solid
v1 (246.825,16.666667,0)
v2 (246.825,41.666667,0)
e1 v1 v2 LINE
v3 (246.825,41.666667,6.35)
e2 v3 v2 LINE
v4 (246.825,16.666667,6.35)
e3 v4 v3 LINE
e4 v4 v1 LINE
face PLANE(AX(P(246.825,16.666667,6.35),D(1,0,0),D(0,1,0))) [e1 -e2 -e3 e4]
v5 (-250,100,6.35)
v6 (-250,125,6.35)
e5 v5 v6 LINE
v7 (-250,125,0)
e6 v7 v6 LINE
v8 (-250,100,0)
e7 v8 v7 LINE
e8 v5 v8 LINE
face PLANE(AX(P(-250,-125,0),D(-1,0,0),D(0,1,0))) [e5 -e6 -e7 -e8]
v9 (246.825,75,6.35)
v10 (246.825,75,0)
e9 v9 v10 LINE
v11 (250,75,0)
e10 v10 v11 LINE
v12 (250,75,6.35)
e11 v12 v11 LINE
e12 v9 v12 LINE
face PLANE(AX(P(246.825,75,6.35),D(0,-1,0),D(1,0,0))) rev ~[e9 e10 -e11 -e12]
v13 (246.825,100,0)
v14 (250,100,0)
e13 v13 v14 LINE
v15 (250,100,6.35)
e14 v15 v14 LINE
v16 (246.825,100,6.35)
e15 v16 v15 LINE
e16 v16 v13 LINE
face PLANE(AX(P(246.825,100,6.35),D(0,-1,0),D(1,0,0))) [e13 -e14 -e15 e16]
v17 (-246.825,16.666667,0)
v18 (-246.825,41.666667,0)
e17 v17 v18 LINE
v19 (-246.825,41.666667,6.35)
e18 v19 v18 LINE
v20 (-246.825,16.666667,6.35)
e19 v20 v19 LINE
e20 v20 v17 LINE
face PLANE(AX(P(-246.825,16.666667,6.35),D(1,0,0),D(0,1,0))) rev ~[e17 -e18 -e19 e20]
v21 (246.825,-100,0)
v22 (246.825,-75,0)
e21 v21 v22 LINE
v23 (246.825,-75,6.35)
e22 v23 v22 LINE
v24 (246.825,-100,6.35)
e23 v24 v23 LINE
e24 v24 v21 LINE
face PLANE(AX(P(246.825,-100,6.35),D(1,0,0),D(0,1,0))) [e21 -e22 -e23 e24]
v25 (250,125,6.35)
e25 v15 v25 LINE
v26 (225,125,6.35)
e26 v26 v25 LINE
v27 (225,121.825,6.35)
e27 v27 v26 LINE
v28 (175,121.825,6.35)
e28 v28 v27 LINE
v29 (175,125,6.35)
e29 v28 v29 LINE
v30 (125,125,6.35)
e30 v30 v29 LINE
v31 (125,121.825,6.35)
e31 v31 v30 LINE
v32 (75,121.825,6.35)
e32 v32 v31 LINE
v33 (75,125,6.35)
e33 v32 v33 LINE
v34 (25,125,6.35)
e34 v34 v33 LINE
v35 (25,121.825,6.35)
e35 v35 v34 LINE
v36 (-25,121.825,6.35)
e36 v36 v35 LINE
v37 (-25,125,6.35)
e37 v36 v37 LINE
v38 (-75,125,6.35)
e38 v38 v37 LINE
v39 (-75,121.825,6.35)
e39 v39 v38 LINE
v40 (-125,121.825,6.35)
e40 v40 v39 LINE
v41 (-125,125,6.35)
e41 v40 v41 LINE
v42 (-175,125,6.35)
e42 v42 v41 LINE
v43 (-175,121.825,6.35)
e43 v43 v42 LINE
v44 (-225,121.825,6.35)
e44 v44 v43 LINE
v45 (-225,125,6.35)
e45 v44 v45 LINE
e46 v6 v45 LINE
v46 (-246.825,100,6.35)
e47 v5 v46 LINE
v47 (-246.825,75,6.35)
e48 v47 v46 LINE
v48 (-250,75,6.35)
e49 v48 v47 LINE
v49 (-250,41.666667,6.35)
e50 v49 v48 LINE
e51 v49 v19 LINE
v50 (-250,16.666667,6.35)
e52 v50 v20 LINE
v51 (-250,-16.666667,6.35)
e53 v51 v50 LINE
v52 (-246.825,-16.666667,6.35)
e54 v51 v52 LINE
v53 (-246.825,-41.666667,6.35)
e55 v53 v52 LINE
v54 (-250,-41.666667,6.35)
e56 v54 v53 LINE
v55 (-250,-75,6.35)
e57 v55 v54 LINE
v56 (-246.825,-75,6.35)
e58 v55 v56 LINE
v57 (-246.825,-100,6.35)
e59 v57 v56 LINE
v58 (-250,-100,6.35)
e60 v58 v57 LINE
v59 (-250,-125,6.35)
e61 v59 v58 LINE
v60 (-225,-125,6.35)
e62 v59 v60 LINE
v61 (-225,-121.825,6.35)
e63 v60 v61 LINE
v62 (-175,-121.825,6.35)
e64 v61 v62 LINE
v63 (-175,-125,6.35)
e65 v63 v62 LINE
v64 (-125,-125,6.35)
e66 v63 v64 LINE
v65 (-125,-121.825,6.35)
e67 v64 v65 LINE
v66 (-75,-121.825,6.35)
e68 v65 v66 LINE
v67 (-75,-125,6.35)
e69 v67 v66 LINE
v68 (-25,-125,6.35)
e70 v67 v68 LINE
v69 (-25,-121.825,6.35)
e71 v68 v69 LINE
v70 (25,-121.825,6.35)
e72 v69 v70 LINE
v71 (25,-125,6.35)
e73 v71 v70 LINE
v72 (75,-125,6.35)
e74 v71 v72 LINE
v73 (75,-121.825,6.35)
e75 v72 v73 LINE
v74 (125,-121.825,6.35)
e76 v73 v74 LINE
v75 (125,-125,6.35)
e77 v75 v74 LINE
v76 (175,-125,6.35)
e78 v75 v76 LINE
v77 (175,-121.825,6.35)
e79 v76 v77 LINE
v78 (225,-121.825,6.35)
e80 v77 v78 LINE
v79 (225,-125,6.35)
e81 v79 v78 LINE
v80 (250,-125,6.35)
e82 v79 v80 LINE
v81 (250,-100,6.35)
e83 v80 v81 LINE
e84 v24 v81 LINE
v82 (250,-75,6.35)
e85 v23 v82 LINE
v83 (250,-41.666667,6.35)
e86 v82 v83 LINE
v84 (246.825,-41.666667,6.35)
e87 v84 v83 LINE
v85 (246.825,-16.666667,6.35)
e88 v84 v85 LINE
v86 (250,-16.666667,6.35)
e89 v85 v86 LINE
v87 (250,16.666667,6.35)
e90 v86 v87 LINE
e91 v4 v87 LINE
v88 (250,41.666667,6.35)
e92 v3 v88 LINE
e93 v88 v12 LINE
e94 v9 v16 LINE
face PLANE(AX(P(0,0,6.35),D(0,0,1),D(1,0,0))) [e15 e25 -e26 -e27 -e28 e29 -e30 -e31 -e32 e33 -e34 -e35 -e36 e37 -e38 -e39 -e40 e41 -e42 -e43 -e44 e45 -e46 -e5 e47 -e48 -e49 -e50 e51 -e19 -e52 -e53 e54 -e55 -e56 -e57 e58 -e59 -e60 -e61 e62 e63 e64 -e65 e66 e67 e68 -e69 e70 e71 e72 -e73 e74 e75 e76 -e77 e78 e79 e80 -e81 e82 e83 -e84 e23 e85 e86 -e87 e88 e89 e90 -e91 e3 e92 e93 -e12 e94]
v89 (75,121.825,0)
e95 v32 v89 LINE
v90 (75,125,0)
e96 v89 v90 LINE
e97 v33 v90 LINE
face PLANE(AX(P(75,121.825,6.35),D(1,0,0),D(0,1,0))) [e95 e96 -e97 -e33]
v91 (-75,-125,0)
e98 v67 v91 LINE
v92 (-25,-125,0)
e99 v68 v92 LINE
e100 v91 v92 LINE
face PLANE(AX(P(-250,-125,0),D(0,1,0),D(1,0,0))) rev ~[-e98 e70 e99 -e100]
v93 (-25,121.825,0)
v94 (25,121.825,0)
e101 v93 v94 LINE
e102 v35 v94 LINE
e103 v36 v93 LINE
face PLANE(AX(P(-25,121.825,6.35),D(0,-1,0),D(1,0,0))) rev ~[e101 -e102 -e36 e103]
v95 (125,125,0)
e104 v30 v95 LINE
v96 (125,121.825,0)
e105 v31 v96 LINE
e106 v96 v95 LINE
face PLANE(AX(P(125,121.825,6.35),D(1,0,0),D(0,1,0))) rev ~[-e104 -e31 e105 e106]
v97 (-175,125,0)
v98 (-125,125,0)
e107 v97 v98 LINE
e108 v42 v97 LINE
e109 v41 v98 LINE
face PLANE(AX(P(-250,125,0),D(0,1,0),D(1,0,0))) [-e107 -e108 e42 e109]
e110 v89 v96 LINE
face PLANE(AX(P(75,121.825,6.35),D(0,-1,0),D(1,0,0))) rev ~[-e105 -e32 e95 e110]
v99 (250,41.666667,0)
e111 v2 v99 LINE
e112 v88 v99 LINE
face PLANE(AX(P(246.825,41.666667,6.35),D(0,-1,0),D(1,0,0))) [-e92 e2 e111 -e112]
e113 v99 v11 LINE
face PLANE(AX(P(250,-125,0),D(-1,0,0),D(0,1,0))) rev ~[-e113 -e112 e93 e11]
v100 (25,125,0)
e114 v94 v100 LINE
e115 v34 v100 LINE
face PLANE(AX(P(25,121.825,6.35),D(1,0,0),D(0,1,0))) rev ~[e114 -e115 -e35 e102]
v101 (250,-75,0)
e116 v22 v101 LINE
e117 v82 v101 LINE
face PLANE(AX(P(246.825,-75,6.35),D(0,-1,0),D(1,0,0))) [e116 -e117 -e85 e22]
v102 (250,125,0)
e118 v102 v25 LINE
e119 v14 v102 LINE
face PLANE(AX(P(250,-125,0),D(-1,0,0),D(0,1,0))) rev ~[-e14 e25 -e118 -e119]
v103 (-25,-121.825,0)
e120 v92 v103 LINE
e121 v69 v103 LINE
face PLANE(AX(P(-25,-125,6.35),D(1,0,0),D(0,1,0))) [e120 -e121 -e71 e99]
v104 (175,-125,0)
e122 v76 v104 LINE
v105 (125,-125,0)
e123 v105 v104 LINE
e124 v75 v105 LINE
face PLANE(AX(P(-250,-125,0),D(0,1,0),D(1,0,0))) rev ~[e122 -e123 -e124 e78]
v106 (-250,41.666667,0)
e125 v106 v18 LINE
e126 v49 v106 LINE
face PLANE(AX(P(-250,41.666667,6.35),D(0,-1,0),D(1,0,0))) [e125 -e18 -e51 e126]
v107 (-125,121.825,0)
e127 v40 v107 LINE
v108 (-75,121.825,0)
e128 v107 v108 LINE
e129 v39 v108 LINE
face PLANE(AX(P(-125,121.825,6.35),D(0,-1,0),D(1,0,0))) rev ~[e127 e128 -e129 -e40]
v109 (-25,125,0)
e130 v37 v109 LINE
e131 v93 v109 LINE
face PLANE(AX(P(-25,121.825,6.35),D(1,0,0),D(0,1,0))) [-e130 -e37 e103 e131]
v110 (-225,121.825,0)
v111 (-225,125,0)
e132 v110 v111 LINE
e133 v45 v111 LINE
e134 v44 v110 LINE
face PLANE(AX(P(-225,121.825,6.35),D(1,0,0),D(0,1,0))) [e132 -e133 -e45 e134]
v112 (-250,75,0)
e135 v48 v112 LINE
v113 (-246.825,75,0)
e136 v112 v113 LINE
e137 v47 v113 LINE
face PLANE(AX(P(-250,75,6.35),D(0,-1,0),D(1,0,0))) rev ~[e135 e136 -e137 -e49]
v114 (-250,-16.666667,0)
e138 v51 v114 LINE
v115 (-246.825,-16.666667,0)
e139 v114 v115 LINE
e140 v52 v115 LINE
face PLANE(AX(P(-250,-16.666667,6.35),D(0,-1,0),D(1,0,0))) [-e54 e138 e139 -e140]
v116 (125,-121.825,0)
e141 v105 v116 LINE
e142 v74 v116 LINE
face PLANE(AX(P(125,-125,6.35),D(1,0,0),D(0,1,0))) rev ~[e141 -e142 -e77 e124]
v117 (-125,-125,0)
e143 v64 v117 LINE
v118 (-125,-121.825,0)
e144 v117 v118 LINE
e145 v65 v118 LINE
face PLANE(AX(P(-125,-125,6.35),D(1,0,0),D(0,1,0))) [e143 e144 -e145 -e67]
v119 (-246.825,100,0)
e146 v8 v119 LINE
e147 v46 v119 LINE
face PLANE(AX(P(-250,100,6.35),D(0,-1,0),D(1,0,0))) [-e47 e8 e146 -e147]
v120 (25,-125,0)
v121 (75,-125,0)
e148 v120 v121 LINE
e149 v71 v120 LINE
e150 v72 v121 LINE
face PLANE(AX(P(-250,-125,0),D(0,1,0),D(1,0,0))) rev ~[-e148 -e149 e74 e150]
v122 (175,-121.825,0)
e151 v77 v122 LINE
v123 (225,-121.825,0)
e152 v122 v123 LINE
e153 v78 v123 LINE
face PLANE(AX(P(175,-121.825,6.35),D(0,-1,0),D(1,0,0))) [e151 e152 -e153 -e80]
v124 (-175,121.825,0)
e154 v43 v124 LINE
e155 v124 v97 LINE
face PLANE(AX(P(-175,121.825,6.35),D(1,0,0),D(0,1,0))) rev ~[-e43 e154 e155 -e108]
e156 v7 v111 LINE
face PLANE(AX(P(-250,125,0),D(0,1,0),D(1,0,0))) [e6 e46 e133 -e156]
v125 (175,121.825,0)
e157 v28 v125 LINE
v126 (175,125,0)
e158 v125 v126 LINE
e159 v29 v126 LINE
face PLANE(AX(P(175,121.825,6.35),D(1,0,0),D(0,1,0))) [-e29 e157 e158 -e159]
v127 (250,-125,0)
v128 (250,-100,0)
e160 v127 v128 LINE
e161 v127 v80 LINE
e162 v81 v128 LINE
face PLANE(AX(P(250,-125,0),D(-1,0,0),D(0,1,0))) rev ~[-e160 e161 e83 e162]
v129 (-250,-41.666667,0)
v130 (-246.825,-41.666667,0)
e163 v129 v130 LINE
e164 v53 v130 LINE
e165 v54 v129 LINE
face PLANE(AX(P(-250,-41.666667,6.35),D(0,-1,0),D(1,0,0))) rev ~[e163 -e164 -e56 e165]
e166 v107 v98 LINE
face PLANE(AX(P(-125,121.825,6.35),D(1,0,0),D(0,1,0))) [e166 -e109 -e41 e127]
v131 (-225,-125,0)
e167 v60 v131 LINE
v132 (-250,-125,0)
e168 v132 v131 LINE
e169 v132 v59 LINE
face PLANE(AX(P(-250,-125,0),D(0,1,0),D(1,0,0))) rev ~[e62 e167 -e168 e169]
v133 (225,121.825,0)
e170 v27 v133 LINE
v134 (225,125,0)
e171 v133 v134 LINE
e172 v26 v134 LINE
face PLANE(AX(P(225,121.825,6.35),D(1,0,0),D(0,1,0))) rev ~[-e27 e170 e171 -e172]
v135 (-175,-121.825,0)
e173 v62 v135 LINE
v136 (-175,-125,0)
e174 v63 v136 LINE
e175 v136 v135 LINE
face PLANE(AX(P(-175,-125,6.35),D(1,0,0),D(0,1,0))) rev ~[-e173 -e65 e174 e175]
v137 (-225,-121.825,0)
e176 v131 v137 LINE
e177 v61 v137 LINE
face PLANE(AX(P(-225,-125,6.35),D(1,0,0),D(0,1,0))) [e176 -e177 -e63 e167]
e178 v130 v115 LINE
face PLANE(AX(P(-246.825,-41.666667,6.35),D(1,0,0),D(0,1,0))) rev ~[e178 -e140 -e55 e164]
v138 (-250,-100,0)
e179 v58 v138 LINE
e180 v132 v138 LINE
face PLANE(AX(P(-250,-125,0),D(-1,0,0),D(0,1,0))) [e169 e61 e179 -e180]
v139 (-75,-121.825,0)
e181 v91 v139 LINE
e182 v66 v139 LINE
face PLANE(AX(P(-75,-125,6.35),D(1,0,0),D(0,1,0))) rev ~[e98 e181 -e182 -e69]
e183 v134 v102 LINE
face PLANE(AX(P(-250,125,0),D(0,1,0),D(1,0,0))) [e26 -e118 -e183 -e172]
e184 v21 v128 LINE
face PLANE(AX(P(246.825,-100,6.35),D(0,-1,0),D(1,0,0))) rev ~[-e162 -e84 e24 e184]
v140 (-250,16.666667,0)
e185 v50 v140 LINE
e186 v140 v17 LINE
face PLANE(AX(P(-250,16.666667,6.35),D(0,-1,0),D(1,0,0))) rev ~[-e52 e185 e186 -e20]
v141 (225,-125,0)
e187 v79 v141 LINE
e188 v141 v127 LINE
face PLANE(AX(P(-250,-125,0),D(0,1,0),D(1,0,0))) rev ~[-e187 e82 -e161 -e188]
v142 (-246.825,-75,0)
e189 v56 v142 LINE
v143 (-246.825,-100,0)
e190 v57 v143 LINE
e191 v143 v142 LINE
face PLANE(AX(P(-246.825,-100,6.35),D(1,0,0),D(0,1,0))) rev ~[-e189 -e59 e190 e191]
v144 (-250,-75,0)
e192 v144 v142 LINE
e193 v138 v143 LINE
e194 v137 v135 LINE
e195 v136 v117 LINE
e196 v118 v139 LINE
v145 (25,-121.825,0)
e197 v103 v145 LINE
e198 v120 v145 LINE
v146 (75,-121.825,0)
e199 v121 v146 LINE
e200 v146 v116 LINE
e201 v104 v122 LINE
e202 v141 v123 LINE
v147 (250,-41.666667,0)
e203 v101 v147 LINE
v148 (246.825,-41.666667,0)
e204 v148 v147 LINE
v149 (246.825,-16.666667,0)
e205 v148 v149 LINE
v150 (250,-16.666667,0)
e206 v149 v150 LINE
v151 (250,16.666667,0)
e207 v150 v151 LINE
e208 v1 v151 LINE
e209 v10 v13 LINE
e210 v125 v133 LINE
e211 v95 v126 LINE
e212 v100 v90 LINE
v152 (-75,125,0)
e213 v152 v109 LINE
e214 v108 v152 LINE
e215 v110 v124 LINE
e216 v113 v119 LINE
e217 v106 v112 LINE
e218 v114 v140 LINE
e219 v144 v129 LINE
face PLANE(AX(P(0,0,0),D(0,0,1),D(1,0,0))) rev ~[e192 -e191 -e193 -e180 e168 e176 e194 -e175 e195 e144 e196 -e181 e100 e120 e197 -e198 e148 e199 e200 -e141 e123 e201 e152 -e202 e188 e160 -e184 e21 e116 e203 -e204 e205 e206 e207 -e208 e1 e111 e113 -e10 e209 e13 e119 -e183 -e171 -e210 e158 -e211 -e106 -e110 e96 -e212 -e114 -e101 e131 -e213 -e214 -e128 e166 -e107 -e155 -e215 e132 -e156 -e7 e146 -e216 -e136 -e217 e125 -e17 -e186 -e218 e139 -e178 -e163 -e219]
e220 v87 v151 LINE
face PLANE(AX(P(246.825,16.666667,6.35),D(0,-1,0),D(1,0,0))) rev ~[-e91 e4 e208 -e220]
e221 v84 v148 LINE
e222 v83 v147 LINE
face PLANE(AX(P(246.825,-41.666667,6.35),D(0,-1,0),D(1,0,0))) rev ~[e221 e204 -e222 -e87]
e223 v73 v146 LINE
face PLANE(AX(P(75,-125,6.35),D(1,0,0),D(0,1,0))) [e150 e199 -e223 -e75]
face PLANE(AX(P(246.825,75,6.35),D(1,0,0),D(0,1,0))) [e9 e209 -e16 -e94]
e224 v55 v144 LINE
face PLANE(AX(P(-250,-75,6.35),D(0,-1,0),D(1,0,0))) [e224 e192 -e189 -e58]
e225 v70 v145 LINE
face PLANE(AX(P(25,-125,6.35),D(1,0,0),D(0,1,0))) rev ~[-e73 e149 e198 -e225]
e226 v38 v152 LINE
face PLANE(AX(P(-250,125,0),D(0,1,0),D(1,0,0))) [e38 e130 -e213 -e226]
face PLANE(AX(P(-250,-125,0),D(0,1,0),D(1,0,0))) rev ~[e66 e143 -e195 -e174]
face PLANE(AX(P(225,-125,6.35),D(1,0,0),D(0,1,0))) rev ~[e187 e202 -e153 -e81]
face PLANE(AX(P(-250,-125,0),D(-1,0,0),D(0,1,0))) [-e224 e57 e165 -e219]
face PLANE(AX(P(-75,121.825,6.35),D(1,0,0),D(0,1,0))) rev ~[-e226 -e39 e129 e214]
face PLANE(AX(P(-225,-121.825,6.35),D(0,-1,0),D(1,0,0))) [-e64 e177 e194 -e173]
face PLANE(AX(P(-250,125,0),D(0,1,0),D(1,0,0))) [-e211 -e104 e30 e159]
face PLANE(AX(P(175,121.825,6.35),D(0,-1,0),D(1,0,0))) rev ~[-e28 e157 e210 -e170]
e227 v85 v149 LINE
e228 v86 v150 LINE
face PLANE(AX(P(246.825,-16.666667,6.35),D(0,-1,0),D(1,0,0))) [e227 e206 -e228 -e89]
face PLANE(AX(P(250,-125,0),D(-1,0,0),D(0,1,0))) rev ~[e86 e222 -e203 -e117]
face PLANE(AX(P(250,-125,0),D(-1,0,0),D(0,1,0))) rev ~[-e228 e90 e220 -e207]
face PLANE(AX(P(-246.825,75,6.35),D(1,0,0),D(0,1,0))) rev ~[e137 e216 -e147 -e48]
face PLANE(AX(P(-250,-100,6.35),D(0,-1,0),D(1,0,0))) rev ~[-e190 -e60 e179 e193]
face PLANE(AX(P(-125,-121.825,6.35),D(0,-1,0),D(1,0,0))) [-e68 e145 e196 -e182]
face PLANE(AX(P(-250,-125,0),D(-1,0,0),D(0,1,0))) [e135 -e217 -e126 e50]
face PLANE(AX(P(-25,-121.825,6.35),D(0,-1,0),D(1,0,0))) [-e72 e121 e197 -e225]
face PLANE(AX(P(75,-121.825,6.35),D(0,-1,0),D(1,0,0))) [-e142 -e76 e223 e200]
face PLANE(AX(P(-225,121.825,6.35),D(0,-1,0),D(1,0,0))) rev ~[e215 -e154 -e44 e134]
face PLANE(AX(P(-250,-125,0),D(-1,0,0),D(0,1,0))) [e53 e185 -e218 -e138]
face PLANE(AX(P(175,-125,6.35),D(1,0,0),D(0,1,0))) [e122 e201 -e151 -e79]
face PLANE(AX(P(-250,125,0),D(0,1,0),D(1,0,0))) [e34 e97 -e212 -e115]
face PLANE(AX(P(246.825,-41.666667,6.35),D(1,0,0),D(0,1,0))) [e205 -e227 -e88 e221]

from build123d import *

# Parameters (mm, degrees)
F0_W     = 500
F0_H     = 250
F1_DEPTH = 6.35
F2_W     = 50
F2_H     = 3.175
F2_W_2   = 3.175
F2_H_2   = 25
F3_DEPTH = 6.351


# Not quite as in the source:
# - a length typed as a fraction of an inch, garbled in the dataset ("3 / 203.2 mm" for 3/8 in), is restored


with BuildPart() as f1:
    # F0 (on Top) → F1 (new body)
    with BuildSketch(Plane.XY):
        Rectangle(F0_W, F0_H)
    extrude(amount=F1_DEPTH)

    # F2 (on face) → F3 (cut, through all)
    with BuildSketch(Plane.XY.offset(6.35)):
        with Locations((-200, 123.4125)):
            Rectangle(F2_W, F2_H)
        with Locations((-200, -123.4125)):
            Rectangle(F2_W, F2_H)
        with Locations((-100, 123.4125)):
            Rectangle(F2_W, F2_H)
        with Locations((-100, -123.4125)):
            Rectangle(F2_W, F2_H)
        with Locations((0, 123.4125)):
            Rectangle(F2_W, F2_H)
        with Locations((0, -123.4125)):
            Rectangle(F2_W, F2_H)
        with Locations((100, 123.4125)):
            Rectangle(F2_W, F2_H)
        with Locations((100, -123.4125)):
            Rectangle(F2_W, F2_H)
        with Locations((200, 123.4125)):
            Rectangle(F2_W, F2_H)
        with Locations((200, -123.4125)):
            Rectangle(F2_W, F2_H)
        with Locations((248.4125, 87.5)):
            Rectangle(F2_W_2, F2_H_2)
        with Locations((248.4125, 29.1666666667)):
            Rectangle(F2_W_2, F2_H_2)
        with Locations((248.4125, -29.1666666667)):
            Rectangle(F2_W_2, F2_H_2)
        with Locations((248.4125, -87.5)):
            Rectangle(F2_W_2, F2_H_2)
        with Locations((-248.4125, -87.5)):
            Rectangle(F2_W_2, F2_H_2)
        with Locations((-248.4125, 29.1666666667)):
            Rectangle(F2_W_2, F2_H_2)
        with Locations((-248.4125, -29.1666666667)):
            Rectangle(F2_W_2, F2_H_2)
        with Locations((-248.4125, 87.5)):
            Rectangle(F2_W_2, F2_H_2)
    extrude(amount=-F3_DEPTH, mode=Mode.SUBTRACT)


solid = f1.part
